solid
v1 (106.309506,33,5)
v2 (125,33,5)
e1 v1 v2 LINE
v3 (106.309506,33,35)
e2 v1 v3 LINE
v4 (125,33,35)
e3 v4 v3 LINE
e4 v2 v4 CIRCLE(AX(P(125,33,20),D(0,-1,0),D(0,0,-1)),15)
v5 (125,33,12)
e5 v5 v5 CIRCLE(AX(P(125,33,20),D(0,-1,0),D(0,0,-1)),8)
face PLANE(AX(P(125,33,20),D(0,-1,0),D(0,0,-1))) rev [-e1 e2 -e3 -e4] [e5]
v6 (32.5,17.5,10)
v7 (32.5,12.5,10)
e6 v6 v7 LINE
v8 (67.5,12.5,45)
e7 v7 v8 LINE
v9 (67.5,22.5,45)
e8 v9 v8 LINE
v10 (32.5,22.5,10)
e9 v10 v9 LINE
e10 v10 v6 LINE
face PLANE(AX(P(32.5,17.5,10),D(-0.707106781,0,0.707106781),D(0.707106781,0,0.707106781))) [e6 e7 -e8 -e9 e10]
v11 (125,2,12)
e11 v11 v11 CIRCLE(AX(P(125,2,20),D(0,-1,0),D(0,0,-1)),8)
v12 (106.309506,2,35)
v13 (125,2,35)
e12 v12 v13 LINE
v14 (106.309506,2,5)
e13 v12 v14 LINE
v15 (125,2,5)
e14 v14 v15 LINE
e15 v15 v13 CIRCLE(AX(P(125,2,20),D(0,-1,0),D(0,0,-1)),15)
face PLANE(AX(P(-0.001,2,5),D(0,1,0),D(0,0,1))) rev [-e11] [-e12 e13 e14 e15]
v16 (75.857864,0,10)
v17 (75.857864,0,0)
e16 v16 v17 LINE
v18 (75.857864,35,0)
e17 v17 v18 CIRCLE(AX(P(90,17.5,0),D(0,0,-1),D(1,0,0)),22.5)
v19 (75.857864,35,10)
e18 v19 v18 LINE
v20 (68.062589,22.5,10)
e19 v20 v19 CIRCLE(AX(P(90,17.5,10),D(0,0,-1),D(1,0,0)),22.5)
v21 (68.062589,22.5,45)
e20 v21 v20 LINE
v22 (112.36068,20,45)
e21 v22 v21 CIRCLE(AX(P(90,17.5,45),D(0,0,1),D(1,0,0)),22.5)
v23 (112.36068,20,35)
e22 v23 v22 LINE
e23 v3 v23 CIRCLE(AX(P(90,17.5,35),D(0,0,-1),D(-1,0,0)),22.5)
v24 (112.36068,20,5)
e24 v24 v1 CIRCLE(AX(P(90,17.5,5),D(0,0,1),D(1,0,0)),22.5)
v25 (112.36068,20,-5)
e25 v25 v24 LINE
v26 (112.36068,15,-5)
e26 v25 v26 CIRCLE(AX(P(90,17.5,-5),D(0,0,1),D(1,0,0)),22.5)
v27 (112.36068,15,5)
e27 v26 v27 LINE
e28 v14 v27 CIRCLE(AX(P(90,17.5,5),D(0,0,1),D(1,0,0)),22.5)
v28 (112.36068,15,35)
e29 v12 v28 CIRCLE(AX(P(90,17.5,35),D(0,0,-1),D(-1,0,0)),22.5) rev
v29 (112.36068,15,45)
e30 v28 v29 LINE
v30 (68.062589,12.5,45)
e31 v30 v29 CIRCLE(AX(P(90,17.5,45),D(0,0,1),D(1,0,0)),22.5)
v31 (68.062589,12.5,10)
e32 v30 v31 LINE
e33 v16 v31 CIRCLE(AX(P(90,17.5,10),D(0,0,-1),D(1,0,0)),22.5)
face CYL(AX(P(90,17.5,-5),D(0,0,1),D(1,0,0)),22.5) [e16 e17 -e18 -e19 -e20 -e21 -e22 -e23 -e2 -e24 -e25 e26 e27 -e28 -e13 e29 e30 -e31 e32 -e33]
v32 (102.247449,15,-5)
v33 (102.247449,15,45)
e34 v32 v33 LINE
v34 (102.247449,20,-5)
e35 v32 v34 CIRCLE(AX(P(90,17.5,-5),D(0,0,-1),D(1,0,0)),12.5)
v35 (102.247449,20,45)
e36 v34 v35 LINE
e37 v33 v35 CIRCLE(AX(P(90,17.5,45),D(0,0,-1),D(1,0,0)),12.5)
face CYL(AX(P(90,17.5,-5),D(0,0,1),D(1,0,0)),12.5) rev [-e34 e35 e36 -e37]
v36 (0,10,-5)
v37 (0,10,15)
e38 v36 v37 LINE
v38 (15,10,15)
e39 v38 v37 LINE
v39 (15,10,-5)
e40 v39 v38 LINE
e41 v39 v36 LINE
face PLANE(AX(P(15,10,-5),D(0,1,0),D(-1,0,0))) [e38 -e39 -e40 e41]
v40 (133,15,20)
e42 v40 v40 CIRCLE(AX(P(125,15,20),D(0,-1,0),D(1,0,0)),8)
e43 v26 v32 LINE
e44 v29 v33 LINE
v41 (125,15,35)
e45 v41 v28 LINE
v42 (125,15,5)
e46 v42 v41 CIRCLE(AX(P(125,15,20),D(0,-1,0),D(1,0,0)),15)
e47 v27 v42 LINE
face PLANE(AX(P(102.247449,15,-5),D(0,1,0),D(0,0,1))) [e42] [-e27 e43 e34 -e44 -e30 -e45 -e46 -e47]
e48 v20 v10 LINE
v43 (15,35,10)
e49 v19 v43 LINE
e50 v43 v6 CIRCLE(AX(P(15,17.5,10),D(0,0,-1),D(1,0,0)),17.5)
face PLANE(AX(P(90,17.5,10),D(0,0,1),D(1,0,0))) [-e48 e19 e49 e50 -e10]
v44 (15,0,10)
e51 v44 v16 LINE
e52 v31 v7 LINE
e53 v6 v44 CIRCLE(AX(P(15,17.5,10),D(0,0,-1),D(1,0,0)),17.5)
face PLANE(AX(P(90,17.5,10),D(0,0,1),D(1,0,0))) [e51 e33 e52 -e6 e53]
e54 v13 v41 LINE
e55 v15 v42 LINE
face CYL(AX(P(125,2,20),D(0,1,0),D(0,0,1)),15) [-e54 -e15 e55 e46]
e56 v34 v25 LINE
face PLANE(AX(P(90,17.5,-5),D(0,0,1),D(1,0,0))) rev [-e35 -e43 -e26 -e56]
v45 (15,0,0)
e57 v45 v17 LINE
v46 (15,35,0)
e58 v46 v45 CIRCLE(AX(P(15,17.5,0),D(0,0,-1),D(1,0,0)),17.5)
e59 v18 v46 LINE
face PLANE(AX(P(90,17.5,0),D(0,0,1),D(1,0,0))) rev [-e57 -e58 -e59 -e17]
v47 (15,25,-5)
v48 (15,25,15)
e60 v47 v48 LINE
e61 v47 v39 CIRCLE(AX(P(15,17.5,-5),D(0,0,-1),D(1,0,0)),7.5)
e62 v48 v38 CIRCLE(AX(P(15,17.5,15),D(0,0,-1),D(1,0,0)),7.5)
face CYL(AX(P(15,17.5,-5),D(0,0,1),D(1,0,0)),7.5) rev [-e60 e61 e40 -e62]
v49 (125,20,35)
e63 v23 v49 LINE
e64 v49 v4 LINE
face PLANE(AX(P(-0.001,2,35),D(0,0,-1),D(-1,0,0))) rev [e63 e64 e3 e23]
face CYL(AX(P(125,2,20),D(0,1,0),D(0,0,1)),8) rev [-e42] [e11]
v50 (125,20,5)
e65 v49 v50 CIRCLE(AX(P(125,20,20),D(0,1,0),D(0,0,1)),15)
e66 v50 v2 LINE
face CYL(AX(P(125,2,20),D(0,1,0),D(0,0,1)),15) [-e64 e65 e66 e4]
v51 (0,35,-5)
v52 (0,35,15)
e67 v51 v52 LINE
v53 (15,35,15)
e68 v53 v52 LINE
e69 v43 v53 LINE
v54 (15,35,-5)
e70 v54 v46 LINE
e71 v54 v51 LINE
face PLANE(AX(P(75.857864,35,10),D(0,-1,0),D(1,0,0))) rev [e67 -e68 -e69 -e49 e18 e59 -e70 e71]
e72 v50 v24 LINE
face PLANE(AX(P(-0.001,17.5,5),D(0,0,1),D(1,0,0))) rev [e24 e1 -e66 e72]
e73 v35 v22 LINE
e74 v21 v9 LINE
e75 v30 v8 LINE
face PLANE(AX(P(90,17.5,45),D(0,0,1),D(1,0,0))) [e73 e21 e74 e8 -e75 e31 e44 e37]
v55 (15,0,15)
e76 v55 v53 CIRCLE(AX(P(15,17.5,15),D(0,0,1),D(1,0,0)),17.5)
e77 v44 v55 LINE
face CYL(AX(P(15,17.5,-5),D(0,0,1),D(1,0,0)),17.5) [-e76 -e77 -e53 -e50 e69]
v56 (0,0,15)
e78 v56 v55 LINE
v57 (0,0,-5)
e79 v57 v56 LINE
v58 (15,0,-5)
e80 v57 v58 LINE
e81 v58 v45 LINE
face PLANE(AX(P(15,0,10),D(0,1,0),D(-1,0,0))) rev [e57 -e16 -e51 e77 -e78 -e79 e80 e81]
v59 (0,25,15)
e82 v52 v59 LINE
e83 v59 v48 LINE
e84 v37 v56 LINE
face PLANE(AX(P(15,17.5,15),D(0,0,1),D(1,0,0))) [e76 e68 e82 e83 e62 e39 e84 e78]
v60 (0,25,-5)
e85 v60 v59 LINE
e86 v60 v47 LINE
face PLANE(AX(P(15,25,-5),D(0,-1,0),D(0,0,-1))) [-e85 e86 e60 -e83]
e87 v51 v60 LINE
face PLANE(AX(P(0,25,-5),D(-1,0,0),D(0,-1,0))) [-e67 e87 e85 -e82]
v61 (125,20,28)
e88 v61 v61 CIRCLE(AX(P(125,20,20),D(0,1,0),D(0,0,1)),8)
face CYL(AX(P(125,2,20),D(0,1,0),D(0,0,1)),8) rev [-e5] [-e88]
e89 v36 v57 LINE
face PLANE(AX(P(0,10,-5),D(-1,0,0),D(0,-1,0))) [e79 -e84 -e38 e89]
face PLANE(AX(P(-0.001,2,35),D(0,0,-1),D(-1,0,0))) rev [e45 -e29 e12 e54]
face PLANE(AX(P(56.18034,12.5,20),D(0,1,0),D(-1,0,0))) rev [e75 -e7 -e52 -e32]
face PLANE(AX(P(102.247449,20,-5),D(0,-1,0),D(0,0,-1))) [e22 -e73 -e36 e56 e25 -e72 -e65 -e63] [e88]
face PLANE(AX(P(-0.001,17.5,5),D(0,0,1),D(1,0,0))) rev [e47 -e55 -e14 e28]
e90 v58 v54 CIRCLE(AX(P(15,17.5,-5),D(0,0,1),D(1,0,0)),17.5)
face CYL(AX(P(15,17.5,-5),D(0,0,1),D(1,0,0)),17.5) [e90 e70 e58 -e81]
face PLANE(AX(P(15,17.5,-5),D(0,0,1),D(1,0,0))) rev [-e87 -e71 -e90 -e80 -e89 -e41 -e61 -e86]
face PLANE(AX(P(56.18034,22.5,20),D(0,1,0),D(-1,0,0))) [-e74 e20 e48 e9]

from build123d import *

# Parameters (mm, degrees)
BOSS_EXTRUDE1_DEPTH       = 10
BOSS_EXTRUDE2_DEPTH       = 5
BOSS_EXTRUDE2_DEPTH_BACK  = 15
BOSS_EXTRUDE3_DEPTH       = 35
BOSS_EXTRUDE3_DEPTH_BACK  = 15
RIB27_REACH               = 125.11
SKETCH19_WALL_W           = 287.352003994
SKETCH19_WALL_H           = 10
BOSS_EXTRUDE4_DEPTH       = 5
RIB29_REACH               = 127.025
SKETCH20_WALL_W           = 301.546848684
SKETCH20_WALL_H           = 10
CUT_EXTRUDE1_START        = -5
CUT_EXTRUDE1_DEPTH        = 5
CUT_EXTRUDE2_DEPTH        = 5
SKETCH37_R                = 8
BOSS_EXTRUDE6_DEPTH       = 15.5
BOSS_EXTRUDE11_REACH      = 129.598
BOSS_EXTRUDE11_END_RADIUS = 22.5
SKETCH45_W                = 30
SKETCH45_H                = 15.5
BOSS_EXTRUDE12_REACH      = 129.598
BOSS_EXTRUDE12_END_RADIUS = 22.5
SKETCH48_W                = 30
SKETCH48_H                = 15.5
SKETCH52_W                = 33.733601919
SKETCH52_H                = 5
CUT_EXTRUDE4_DEPTH        = 154.948043183


with BuildPart() as part:
    # Sketch1 → Boss-Extrude1 (new body)
    with BuildSketch(Plane.XY):
        with BuildLine():
            Line((15, 0), (75.857864376, 0))
            ThreePointArc((75.857864376, 0), (67.5, 17.5), (75.857864376, 35))
            Line((75.857864376, 35), (15, 35))
            ThreePointArc((15, 35), (32.5, 17.5), (15, 0))
        make_face()
    extrude(amount=BOSS_EXTRUDE1_DEPTH)

    # Sketch2 → Boss-Extrude2 (add, two sides: drawn at the far end of the back side and taken through both)
    with BuildSketch(Plane.XY.offset(10).offset(-BOSS_EXTRUDE2_DEPTH_BACK)):
        with BuildLine():
            Line((15, 10), (0, 10))
            Line((0, 10), (0, 0))
            Line((0, 0), (15, 0))
            ThreePointArc((15, 0), (32.5, 17.5), (15, 35))
            Line((15, 35), (0, 35))
            Line((0, 35), (0, 25))
            Line((0, 25), (15, 25))
            ThreePointArc((15, 25), (22.5, 17.5), (15, 10))
        make_face()
    extrude(amount=BOSS_EXTRUDE2_DEPTH + BOSS_EXTRUDE2_DEPTH_BACK)

    # Sketch3 → Boss-Extrude3 (add, two sides: drawn at the far end of the back side and taken through both)
    with BuildSketch(Plane.XY.offset(10).offset(-BOSS_EXTRUDE3_DEPTH_BACK)):
        with BuildLine():
            Line((102.247448714, 20), (112.360679775, 20))
            ThreePointArc((112.360679775, 20), (67.5, 17.5), (112.360679775, 15))
            Line((112.360679775, 15), (102.247448714, 15))
            ThreePointArc((102.247448714, 15), (77.5, 17.5), (102.247448714, 20))
        make_face()
    extrude(amount=BOSS_EXTRUDE3_DEPTH + BOSS_EXTRUDE3_DEPTH_BACK)

    # Sketch19 wall → Rib27 (add, up to next)
    with BuildSketch(Plane(origin=(50, 17.5, 18.75), x_dir=(0.894427191, 0, 0.4472135955), z_dir=(0.4472135955, 0, -0.894427191)), mode=Mode.PRIVATE) as rib27_sk1:
        Rectangle(SKETCH19_WALL_W, SKETCH19_WALL_H)
    rib27_tool1 = extrude(rib27_sk1.sketch, amount=RIB27_REACH, mode=Mode.PRIVATE) - part.part
    add(rib27_tool1.solids().sort_by_distance((50, 17.5, 18.75))[0])

    # Sketch21 → Boss-Extrude4 (add)
    with BuildSketch(Plane.XY.offset(45)):
        with BuildLine():
            Line((102.247448714, 20), (112.360679775, 20))
            ThreePointArc((112.360679775, 20), (67.5, 17.5), (112.360679775, 15))
            Line((112.360679775, 15), (102.247448714, 15))
            ThreePointArc((102.247448714, 15), (77.5, 17.5), (102.247448714, 20))
        make_face()
    extrude(amount=BOSS_EXTRUDE4_DEPTH)

    # Sketch20 wall → Rib29 (add, up to next)
    with BuildSketch(Plane(origin=(50, 17.5, 27.5), x_dir=(0.707106781187, 0, 0.707106781187), z_dir=(0.707106781187, 0, -0.707106781187)), mode=Mode.PRIVATE) as rib29_sk1:
        Rectangle(SKETCH20_WALL_W, SKETCH20_WALL_H)
    rib29_tool1 = extrude(rib29_sk1.sketch, amount=RIB29_REACH, mode=Mode.PRIVATE) - part.part
    add(rib29_tool1.solids().sort_by_distance((50, 17.5, 27.5))[0])

    # Sketch23 → Cut-Extrude1 (cut)
    with BuildSketch(Plane.XY.offset(50).offset(CUT_EXTRUDE1_START)):
        with BuildLine():
            Line((102.247448714, 20), (112.360679775, 20))
            ThreePointArc((112.360679775, 20), (67.5, 17.5), (112.360679775, 15))
            Line((112.360679775, 15), (102.247448714, 15))
            ThreePointArc((102.247448714, 15), (77.5, 17.5), (102.247448714, 20))
        make_face()
    extrude(amount=CUT_EXTRUDE1_DEPTH, mode=Mode.SUBTRACT)

    # Sketch25 → Cut-Extrude2 (cut)
    with BuildSketch(Plane.ZY.offset(-67.5)):
        Polygon((45, 17.5), (45, 9.449706044), (52.526454381, 9.449706044), (52.526454381, 28.660137354), (45, 28.660137354), align=None)
    extrude(amount=-CUT_EXTRUDE2_DEPTH, mode=Mode.SUBTRACT)



with BuildPart() as body_2:
    # Sketch37 → Boss-Extrude6 (new, symmetric)
    with BuildSketch(Plane(origin=(0, 17.5, 0), x_dir=(-1, 0, 0), z_dir=(0, -1, 0))):
        with BuildLine():
            Line((-125, -5), (-112.5, -5))
            Line((-112.5, -5), (-112.5, -35))
            Line((-112.5, -35), (-125, -35))
            ThreePointArc((-125, -35), (-140, -20), (-125, -5))
        make_face()
        with Locations((-125, -20)):
            Circle(SKETCH37_R, mode=Mode.SUBTRACT)
    extrude(amount=BOSS_EXTRUDE6_DEPTH, both=True)


with BuildPart() as part_1:
    add(part.part)

    add(body_2.part)  # Boss-Extrude11 merges body 2
    # Boss-Extrude11: up to this cylinder (the profile starts outside it)
    boss_extrude11_end = Plane(origin=(90, 17.5, 20), z_dir=(0, 0, 1)) * Cylinder(BOSS_EXTRUDE11_END_RADIUS, 305.196, mode=Mode.PRIVATE)
    # Sketch45 → Boss-Extrude11 (add, up to the surface)
    with BuildSketch(Plane.ZY.offset(-112.5), mode=Mode.PRIVATE) as boss_extrude11_sk1:
        with Locations((20, 9.75)):
            Rectangle(SKETCH45_W, SKETCH45_H)
    boss_extrude11_tool1 = extrude(boss_extrude11_sk1.sketch, amount=BOSS_EXTRUDE11_REACH, mode=Mode.PRIVATE) - boss_extrude11_end
    add(boss_extrude11_tool1.solids().sort_by_distance((112.5, 9.75, 20))[0])

    # Boss-Extrude12: up to this cylinder (the profile starts outside it)
    boss_extrude12_end = Plane(origin=(90, 17.5, 20), z_dir=(0, 0, 1)) * Cylinder(BOSS_EXTRUDE12_END_RADIUS, 305.196, mode=Mode.PRIVATE)
    # Sketch48 → Boss-Extrude12 (add, up to the surface)
    with BuildSketch(Plane.ZY.offset(-112.5), mode=Mode.PRIVATE) as boss_extrude12_sk1:
        with Locations((20, 25.25)):
            Rectangle(SKETCH48_W, SKETCH48_H)
    boss_extrude12_tool1 = extrude(boss_extrude12_sk1.sketch, amount=BOSS_EXTRUDE12_REACH, mode=Mode.PRIVATE) - boss_extrude12_end
    add(boss_extrude12_tool1.solids().sort_by_distance((112.5, 25.25, 20))[0])

    # Sketch52 → Cut-Extrude4 (cut, through all)
    with BuildSketch(Plane.XY.offset(45)):
        with Locations((129.227480735, 17.5)):
            Rectangle(SKETCH52_W, SKETCH52_H)
    extrude(amount=-CUT_EXTRUDE4_DEPTH, mode=Mode.SUBTRACT)


solid = part_1.part
